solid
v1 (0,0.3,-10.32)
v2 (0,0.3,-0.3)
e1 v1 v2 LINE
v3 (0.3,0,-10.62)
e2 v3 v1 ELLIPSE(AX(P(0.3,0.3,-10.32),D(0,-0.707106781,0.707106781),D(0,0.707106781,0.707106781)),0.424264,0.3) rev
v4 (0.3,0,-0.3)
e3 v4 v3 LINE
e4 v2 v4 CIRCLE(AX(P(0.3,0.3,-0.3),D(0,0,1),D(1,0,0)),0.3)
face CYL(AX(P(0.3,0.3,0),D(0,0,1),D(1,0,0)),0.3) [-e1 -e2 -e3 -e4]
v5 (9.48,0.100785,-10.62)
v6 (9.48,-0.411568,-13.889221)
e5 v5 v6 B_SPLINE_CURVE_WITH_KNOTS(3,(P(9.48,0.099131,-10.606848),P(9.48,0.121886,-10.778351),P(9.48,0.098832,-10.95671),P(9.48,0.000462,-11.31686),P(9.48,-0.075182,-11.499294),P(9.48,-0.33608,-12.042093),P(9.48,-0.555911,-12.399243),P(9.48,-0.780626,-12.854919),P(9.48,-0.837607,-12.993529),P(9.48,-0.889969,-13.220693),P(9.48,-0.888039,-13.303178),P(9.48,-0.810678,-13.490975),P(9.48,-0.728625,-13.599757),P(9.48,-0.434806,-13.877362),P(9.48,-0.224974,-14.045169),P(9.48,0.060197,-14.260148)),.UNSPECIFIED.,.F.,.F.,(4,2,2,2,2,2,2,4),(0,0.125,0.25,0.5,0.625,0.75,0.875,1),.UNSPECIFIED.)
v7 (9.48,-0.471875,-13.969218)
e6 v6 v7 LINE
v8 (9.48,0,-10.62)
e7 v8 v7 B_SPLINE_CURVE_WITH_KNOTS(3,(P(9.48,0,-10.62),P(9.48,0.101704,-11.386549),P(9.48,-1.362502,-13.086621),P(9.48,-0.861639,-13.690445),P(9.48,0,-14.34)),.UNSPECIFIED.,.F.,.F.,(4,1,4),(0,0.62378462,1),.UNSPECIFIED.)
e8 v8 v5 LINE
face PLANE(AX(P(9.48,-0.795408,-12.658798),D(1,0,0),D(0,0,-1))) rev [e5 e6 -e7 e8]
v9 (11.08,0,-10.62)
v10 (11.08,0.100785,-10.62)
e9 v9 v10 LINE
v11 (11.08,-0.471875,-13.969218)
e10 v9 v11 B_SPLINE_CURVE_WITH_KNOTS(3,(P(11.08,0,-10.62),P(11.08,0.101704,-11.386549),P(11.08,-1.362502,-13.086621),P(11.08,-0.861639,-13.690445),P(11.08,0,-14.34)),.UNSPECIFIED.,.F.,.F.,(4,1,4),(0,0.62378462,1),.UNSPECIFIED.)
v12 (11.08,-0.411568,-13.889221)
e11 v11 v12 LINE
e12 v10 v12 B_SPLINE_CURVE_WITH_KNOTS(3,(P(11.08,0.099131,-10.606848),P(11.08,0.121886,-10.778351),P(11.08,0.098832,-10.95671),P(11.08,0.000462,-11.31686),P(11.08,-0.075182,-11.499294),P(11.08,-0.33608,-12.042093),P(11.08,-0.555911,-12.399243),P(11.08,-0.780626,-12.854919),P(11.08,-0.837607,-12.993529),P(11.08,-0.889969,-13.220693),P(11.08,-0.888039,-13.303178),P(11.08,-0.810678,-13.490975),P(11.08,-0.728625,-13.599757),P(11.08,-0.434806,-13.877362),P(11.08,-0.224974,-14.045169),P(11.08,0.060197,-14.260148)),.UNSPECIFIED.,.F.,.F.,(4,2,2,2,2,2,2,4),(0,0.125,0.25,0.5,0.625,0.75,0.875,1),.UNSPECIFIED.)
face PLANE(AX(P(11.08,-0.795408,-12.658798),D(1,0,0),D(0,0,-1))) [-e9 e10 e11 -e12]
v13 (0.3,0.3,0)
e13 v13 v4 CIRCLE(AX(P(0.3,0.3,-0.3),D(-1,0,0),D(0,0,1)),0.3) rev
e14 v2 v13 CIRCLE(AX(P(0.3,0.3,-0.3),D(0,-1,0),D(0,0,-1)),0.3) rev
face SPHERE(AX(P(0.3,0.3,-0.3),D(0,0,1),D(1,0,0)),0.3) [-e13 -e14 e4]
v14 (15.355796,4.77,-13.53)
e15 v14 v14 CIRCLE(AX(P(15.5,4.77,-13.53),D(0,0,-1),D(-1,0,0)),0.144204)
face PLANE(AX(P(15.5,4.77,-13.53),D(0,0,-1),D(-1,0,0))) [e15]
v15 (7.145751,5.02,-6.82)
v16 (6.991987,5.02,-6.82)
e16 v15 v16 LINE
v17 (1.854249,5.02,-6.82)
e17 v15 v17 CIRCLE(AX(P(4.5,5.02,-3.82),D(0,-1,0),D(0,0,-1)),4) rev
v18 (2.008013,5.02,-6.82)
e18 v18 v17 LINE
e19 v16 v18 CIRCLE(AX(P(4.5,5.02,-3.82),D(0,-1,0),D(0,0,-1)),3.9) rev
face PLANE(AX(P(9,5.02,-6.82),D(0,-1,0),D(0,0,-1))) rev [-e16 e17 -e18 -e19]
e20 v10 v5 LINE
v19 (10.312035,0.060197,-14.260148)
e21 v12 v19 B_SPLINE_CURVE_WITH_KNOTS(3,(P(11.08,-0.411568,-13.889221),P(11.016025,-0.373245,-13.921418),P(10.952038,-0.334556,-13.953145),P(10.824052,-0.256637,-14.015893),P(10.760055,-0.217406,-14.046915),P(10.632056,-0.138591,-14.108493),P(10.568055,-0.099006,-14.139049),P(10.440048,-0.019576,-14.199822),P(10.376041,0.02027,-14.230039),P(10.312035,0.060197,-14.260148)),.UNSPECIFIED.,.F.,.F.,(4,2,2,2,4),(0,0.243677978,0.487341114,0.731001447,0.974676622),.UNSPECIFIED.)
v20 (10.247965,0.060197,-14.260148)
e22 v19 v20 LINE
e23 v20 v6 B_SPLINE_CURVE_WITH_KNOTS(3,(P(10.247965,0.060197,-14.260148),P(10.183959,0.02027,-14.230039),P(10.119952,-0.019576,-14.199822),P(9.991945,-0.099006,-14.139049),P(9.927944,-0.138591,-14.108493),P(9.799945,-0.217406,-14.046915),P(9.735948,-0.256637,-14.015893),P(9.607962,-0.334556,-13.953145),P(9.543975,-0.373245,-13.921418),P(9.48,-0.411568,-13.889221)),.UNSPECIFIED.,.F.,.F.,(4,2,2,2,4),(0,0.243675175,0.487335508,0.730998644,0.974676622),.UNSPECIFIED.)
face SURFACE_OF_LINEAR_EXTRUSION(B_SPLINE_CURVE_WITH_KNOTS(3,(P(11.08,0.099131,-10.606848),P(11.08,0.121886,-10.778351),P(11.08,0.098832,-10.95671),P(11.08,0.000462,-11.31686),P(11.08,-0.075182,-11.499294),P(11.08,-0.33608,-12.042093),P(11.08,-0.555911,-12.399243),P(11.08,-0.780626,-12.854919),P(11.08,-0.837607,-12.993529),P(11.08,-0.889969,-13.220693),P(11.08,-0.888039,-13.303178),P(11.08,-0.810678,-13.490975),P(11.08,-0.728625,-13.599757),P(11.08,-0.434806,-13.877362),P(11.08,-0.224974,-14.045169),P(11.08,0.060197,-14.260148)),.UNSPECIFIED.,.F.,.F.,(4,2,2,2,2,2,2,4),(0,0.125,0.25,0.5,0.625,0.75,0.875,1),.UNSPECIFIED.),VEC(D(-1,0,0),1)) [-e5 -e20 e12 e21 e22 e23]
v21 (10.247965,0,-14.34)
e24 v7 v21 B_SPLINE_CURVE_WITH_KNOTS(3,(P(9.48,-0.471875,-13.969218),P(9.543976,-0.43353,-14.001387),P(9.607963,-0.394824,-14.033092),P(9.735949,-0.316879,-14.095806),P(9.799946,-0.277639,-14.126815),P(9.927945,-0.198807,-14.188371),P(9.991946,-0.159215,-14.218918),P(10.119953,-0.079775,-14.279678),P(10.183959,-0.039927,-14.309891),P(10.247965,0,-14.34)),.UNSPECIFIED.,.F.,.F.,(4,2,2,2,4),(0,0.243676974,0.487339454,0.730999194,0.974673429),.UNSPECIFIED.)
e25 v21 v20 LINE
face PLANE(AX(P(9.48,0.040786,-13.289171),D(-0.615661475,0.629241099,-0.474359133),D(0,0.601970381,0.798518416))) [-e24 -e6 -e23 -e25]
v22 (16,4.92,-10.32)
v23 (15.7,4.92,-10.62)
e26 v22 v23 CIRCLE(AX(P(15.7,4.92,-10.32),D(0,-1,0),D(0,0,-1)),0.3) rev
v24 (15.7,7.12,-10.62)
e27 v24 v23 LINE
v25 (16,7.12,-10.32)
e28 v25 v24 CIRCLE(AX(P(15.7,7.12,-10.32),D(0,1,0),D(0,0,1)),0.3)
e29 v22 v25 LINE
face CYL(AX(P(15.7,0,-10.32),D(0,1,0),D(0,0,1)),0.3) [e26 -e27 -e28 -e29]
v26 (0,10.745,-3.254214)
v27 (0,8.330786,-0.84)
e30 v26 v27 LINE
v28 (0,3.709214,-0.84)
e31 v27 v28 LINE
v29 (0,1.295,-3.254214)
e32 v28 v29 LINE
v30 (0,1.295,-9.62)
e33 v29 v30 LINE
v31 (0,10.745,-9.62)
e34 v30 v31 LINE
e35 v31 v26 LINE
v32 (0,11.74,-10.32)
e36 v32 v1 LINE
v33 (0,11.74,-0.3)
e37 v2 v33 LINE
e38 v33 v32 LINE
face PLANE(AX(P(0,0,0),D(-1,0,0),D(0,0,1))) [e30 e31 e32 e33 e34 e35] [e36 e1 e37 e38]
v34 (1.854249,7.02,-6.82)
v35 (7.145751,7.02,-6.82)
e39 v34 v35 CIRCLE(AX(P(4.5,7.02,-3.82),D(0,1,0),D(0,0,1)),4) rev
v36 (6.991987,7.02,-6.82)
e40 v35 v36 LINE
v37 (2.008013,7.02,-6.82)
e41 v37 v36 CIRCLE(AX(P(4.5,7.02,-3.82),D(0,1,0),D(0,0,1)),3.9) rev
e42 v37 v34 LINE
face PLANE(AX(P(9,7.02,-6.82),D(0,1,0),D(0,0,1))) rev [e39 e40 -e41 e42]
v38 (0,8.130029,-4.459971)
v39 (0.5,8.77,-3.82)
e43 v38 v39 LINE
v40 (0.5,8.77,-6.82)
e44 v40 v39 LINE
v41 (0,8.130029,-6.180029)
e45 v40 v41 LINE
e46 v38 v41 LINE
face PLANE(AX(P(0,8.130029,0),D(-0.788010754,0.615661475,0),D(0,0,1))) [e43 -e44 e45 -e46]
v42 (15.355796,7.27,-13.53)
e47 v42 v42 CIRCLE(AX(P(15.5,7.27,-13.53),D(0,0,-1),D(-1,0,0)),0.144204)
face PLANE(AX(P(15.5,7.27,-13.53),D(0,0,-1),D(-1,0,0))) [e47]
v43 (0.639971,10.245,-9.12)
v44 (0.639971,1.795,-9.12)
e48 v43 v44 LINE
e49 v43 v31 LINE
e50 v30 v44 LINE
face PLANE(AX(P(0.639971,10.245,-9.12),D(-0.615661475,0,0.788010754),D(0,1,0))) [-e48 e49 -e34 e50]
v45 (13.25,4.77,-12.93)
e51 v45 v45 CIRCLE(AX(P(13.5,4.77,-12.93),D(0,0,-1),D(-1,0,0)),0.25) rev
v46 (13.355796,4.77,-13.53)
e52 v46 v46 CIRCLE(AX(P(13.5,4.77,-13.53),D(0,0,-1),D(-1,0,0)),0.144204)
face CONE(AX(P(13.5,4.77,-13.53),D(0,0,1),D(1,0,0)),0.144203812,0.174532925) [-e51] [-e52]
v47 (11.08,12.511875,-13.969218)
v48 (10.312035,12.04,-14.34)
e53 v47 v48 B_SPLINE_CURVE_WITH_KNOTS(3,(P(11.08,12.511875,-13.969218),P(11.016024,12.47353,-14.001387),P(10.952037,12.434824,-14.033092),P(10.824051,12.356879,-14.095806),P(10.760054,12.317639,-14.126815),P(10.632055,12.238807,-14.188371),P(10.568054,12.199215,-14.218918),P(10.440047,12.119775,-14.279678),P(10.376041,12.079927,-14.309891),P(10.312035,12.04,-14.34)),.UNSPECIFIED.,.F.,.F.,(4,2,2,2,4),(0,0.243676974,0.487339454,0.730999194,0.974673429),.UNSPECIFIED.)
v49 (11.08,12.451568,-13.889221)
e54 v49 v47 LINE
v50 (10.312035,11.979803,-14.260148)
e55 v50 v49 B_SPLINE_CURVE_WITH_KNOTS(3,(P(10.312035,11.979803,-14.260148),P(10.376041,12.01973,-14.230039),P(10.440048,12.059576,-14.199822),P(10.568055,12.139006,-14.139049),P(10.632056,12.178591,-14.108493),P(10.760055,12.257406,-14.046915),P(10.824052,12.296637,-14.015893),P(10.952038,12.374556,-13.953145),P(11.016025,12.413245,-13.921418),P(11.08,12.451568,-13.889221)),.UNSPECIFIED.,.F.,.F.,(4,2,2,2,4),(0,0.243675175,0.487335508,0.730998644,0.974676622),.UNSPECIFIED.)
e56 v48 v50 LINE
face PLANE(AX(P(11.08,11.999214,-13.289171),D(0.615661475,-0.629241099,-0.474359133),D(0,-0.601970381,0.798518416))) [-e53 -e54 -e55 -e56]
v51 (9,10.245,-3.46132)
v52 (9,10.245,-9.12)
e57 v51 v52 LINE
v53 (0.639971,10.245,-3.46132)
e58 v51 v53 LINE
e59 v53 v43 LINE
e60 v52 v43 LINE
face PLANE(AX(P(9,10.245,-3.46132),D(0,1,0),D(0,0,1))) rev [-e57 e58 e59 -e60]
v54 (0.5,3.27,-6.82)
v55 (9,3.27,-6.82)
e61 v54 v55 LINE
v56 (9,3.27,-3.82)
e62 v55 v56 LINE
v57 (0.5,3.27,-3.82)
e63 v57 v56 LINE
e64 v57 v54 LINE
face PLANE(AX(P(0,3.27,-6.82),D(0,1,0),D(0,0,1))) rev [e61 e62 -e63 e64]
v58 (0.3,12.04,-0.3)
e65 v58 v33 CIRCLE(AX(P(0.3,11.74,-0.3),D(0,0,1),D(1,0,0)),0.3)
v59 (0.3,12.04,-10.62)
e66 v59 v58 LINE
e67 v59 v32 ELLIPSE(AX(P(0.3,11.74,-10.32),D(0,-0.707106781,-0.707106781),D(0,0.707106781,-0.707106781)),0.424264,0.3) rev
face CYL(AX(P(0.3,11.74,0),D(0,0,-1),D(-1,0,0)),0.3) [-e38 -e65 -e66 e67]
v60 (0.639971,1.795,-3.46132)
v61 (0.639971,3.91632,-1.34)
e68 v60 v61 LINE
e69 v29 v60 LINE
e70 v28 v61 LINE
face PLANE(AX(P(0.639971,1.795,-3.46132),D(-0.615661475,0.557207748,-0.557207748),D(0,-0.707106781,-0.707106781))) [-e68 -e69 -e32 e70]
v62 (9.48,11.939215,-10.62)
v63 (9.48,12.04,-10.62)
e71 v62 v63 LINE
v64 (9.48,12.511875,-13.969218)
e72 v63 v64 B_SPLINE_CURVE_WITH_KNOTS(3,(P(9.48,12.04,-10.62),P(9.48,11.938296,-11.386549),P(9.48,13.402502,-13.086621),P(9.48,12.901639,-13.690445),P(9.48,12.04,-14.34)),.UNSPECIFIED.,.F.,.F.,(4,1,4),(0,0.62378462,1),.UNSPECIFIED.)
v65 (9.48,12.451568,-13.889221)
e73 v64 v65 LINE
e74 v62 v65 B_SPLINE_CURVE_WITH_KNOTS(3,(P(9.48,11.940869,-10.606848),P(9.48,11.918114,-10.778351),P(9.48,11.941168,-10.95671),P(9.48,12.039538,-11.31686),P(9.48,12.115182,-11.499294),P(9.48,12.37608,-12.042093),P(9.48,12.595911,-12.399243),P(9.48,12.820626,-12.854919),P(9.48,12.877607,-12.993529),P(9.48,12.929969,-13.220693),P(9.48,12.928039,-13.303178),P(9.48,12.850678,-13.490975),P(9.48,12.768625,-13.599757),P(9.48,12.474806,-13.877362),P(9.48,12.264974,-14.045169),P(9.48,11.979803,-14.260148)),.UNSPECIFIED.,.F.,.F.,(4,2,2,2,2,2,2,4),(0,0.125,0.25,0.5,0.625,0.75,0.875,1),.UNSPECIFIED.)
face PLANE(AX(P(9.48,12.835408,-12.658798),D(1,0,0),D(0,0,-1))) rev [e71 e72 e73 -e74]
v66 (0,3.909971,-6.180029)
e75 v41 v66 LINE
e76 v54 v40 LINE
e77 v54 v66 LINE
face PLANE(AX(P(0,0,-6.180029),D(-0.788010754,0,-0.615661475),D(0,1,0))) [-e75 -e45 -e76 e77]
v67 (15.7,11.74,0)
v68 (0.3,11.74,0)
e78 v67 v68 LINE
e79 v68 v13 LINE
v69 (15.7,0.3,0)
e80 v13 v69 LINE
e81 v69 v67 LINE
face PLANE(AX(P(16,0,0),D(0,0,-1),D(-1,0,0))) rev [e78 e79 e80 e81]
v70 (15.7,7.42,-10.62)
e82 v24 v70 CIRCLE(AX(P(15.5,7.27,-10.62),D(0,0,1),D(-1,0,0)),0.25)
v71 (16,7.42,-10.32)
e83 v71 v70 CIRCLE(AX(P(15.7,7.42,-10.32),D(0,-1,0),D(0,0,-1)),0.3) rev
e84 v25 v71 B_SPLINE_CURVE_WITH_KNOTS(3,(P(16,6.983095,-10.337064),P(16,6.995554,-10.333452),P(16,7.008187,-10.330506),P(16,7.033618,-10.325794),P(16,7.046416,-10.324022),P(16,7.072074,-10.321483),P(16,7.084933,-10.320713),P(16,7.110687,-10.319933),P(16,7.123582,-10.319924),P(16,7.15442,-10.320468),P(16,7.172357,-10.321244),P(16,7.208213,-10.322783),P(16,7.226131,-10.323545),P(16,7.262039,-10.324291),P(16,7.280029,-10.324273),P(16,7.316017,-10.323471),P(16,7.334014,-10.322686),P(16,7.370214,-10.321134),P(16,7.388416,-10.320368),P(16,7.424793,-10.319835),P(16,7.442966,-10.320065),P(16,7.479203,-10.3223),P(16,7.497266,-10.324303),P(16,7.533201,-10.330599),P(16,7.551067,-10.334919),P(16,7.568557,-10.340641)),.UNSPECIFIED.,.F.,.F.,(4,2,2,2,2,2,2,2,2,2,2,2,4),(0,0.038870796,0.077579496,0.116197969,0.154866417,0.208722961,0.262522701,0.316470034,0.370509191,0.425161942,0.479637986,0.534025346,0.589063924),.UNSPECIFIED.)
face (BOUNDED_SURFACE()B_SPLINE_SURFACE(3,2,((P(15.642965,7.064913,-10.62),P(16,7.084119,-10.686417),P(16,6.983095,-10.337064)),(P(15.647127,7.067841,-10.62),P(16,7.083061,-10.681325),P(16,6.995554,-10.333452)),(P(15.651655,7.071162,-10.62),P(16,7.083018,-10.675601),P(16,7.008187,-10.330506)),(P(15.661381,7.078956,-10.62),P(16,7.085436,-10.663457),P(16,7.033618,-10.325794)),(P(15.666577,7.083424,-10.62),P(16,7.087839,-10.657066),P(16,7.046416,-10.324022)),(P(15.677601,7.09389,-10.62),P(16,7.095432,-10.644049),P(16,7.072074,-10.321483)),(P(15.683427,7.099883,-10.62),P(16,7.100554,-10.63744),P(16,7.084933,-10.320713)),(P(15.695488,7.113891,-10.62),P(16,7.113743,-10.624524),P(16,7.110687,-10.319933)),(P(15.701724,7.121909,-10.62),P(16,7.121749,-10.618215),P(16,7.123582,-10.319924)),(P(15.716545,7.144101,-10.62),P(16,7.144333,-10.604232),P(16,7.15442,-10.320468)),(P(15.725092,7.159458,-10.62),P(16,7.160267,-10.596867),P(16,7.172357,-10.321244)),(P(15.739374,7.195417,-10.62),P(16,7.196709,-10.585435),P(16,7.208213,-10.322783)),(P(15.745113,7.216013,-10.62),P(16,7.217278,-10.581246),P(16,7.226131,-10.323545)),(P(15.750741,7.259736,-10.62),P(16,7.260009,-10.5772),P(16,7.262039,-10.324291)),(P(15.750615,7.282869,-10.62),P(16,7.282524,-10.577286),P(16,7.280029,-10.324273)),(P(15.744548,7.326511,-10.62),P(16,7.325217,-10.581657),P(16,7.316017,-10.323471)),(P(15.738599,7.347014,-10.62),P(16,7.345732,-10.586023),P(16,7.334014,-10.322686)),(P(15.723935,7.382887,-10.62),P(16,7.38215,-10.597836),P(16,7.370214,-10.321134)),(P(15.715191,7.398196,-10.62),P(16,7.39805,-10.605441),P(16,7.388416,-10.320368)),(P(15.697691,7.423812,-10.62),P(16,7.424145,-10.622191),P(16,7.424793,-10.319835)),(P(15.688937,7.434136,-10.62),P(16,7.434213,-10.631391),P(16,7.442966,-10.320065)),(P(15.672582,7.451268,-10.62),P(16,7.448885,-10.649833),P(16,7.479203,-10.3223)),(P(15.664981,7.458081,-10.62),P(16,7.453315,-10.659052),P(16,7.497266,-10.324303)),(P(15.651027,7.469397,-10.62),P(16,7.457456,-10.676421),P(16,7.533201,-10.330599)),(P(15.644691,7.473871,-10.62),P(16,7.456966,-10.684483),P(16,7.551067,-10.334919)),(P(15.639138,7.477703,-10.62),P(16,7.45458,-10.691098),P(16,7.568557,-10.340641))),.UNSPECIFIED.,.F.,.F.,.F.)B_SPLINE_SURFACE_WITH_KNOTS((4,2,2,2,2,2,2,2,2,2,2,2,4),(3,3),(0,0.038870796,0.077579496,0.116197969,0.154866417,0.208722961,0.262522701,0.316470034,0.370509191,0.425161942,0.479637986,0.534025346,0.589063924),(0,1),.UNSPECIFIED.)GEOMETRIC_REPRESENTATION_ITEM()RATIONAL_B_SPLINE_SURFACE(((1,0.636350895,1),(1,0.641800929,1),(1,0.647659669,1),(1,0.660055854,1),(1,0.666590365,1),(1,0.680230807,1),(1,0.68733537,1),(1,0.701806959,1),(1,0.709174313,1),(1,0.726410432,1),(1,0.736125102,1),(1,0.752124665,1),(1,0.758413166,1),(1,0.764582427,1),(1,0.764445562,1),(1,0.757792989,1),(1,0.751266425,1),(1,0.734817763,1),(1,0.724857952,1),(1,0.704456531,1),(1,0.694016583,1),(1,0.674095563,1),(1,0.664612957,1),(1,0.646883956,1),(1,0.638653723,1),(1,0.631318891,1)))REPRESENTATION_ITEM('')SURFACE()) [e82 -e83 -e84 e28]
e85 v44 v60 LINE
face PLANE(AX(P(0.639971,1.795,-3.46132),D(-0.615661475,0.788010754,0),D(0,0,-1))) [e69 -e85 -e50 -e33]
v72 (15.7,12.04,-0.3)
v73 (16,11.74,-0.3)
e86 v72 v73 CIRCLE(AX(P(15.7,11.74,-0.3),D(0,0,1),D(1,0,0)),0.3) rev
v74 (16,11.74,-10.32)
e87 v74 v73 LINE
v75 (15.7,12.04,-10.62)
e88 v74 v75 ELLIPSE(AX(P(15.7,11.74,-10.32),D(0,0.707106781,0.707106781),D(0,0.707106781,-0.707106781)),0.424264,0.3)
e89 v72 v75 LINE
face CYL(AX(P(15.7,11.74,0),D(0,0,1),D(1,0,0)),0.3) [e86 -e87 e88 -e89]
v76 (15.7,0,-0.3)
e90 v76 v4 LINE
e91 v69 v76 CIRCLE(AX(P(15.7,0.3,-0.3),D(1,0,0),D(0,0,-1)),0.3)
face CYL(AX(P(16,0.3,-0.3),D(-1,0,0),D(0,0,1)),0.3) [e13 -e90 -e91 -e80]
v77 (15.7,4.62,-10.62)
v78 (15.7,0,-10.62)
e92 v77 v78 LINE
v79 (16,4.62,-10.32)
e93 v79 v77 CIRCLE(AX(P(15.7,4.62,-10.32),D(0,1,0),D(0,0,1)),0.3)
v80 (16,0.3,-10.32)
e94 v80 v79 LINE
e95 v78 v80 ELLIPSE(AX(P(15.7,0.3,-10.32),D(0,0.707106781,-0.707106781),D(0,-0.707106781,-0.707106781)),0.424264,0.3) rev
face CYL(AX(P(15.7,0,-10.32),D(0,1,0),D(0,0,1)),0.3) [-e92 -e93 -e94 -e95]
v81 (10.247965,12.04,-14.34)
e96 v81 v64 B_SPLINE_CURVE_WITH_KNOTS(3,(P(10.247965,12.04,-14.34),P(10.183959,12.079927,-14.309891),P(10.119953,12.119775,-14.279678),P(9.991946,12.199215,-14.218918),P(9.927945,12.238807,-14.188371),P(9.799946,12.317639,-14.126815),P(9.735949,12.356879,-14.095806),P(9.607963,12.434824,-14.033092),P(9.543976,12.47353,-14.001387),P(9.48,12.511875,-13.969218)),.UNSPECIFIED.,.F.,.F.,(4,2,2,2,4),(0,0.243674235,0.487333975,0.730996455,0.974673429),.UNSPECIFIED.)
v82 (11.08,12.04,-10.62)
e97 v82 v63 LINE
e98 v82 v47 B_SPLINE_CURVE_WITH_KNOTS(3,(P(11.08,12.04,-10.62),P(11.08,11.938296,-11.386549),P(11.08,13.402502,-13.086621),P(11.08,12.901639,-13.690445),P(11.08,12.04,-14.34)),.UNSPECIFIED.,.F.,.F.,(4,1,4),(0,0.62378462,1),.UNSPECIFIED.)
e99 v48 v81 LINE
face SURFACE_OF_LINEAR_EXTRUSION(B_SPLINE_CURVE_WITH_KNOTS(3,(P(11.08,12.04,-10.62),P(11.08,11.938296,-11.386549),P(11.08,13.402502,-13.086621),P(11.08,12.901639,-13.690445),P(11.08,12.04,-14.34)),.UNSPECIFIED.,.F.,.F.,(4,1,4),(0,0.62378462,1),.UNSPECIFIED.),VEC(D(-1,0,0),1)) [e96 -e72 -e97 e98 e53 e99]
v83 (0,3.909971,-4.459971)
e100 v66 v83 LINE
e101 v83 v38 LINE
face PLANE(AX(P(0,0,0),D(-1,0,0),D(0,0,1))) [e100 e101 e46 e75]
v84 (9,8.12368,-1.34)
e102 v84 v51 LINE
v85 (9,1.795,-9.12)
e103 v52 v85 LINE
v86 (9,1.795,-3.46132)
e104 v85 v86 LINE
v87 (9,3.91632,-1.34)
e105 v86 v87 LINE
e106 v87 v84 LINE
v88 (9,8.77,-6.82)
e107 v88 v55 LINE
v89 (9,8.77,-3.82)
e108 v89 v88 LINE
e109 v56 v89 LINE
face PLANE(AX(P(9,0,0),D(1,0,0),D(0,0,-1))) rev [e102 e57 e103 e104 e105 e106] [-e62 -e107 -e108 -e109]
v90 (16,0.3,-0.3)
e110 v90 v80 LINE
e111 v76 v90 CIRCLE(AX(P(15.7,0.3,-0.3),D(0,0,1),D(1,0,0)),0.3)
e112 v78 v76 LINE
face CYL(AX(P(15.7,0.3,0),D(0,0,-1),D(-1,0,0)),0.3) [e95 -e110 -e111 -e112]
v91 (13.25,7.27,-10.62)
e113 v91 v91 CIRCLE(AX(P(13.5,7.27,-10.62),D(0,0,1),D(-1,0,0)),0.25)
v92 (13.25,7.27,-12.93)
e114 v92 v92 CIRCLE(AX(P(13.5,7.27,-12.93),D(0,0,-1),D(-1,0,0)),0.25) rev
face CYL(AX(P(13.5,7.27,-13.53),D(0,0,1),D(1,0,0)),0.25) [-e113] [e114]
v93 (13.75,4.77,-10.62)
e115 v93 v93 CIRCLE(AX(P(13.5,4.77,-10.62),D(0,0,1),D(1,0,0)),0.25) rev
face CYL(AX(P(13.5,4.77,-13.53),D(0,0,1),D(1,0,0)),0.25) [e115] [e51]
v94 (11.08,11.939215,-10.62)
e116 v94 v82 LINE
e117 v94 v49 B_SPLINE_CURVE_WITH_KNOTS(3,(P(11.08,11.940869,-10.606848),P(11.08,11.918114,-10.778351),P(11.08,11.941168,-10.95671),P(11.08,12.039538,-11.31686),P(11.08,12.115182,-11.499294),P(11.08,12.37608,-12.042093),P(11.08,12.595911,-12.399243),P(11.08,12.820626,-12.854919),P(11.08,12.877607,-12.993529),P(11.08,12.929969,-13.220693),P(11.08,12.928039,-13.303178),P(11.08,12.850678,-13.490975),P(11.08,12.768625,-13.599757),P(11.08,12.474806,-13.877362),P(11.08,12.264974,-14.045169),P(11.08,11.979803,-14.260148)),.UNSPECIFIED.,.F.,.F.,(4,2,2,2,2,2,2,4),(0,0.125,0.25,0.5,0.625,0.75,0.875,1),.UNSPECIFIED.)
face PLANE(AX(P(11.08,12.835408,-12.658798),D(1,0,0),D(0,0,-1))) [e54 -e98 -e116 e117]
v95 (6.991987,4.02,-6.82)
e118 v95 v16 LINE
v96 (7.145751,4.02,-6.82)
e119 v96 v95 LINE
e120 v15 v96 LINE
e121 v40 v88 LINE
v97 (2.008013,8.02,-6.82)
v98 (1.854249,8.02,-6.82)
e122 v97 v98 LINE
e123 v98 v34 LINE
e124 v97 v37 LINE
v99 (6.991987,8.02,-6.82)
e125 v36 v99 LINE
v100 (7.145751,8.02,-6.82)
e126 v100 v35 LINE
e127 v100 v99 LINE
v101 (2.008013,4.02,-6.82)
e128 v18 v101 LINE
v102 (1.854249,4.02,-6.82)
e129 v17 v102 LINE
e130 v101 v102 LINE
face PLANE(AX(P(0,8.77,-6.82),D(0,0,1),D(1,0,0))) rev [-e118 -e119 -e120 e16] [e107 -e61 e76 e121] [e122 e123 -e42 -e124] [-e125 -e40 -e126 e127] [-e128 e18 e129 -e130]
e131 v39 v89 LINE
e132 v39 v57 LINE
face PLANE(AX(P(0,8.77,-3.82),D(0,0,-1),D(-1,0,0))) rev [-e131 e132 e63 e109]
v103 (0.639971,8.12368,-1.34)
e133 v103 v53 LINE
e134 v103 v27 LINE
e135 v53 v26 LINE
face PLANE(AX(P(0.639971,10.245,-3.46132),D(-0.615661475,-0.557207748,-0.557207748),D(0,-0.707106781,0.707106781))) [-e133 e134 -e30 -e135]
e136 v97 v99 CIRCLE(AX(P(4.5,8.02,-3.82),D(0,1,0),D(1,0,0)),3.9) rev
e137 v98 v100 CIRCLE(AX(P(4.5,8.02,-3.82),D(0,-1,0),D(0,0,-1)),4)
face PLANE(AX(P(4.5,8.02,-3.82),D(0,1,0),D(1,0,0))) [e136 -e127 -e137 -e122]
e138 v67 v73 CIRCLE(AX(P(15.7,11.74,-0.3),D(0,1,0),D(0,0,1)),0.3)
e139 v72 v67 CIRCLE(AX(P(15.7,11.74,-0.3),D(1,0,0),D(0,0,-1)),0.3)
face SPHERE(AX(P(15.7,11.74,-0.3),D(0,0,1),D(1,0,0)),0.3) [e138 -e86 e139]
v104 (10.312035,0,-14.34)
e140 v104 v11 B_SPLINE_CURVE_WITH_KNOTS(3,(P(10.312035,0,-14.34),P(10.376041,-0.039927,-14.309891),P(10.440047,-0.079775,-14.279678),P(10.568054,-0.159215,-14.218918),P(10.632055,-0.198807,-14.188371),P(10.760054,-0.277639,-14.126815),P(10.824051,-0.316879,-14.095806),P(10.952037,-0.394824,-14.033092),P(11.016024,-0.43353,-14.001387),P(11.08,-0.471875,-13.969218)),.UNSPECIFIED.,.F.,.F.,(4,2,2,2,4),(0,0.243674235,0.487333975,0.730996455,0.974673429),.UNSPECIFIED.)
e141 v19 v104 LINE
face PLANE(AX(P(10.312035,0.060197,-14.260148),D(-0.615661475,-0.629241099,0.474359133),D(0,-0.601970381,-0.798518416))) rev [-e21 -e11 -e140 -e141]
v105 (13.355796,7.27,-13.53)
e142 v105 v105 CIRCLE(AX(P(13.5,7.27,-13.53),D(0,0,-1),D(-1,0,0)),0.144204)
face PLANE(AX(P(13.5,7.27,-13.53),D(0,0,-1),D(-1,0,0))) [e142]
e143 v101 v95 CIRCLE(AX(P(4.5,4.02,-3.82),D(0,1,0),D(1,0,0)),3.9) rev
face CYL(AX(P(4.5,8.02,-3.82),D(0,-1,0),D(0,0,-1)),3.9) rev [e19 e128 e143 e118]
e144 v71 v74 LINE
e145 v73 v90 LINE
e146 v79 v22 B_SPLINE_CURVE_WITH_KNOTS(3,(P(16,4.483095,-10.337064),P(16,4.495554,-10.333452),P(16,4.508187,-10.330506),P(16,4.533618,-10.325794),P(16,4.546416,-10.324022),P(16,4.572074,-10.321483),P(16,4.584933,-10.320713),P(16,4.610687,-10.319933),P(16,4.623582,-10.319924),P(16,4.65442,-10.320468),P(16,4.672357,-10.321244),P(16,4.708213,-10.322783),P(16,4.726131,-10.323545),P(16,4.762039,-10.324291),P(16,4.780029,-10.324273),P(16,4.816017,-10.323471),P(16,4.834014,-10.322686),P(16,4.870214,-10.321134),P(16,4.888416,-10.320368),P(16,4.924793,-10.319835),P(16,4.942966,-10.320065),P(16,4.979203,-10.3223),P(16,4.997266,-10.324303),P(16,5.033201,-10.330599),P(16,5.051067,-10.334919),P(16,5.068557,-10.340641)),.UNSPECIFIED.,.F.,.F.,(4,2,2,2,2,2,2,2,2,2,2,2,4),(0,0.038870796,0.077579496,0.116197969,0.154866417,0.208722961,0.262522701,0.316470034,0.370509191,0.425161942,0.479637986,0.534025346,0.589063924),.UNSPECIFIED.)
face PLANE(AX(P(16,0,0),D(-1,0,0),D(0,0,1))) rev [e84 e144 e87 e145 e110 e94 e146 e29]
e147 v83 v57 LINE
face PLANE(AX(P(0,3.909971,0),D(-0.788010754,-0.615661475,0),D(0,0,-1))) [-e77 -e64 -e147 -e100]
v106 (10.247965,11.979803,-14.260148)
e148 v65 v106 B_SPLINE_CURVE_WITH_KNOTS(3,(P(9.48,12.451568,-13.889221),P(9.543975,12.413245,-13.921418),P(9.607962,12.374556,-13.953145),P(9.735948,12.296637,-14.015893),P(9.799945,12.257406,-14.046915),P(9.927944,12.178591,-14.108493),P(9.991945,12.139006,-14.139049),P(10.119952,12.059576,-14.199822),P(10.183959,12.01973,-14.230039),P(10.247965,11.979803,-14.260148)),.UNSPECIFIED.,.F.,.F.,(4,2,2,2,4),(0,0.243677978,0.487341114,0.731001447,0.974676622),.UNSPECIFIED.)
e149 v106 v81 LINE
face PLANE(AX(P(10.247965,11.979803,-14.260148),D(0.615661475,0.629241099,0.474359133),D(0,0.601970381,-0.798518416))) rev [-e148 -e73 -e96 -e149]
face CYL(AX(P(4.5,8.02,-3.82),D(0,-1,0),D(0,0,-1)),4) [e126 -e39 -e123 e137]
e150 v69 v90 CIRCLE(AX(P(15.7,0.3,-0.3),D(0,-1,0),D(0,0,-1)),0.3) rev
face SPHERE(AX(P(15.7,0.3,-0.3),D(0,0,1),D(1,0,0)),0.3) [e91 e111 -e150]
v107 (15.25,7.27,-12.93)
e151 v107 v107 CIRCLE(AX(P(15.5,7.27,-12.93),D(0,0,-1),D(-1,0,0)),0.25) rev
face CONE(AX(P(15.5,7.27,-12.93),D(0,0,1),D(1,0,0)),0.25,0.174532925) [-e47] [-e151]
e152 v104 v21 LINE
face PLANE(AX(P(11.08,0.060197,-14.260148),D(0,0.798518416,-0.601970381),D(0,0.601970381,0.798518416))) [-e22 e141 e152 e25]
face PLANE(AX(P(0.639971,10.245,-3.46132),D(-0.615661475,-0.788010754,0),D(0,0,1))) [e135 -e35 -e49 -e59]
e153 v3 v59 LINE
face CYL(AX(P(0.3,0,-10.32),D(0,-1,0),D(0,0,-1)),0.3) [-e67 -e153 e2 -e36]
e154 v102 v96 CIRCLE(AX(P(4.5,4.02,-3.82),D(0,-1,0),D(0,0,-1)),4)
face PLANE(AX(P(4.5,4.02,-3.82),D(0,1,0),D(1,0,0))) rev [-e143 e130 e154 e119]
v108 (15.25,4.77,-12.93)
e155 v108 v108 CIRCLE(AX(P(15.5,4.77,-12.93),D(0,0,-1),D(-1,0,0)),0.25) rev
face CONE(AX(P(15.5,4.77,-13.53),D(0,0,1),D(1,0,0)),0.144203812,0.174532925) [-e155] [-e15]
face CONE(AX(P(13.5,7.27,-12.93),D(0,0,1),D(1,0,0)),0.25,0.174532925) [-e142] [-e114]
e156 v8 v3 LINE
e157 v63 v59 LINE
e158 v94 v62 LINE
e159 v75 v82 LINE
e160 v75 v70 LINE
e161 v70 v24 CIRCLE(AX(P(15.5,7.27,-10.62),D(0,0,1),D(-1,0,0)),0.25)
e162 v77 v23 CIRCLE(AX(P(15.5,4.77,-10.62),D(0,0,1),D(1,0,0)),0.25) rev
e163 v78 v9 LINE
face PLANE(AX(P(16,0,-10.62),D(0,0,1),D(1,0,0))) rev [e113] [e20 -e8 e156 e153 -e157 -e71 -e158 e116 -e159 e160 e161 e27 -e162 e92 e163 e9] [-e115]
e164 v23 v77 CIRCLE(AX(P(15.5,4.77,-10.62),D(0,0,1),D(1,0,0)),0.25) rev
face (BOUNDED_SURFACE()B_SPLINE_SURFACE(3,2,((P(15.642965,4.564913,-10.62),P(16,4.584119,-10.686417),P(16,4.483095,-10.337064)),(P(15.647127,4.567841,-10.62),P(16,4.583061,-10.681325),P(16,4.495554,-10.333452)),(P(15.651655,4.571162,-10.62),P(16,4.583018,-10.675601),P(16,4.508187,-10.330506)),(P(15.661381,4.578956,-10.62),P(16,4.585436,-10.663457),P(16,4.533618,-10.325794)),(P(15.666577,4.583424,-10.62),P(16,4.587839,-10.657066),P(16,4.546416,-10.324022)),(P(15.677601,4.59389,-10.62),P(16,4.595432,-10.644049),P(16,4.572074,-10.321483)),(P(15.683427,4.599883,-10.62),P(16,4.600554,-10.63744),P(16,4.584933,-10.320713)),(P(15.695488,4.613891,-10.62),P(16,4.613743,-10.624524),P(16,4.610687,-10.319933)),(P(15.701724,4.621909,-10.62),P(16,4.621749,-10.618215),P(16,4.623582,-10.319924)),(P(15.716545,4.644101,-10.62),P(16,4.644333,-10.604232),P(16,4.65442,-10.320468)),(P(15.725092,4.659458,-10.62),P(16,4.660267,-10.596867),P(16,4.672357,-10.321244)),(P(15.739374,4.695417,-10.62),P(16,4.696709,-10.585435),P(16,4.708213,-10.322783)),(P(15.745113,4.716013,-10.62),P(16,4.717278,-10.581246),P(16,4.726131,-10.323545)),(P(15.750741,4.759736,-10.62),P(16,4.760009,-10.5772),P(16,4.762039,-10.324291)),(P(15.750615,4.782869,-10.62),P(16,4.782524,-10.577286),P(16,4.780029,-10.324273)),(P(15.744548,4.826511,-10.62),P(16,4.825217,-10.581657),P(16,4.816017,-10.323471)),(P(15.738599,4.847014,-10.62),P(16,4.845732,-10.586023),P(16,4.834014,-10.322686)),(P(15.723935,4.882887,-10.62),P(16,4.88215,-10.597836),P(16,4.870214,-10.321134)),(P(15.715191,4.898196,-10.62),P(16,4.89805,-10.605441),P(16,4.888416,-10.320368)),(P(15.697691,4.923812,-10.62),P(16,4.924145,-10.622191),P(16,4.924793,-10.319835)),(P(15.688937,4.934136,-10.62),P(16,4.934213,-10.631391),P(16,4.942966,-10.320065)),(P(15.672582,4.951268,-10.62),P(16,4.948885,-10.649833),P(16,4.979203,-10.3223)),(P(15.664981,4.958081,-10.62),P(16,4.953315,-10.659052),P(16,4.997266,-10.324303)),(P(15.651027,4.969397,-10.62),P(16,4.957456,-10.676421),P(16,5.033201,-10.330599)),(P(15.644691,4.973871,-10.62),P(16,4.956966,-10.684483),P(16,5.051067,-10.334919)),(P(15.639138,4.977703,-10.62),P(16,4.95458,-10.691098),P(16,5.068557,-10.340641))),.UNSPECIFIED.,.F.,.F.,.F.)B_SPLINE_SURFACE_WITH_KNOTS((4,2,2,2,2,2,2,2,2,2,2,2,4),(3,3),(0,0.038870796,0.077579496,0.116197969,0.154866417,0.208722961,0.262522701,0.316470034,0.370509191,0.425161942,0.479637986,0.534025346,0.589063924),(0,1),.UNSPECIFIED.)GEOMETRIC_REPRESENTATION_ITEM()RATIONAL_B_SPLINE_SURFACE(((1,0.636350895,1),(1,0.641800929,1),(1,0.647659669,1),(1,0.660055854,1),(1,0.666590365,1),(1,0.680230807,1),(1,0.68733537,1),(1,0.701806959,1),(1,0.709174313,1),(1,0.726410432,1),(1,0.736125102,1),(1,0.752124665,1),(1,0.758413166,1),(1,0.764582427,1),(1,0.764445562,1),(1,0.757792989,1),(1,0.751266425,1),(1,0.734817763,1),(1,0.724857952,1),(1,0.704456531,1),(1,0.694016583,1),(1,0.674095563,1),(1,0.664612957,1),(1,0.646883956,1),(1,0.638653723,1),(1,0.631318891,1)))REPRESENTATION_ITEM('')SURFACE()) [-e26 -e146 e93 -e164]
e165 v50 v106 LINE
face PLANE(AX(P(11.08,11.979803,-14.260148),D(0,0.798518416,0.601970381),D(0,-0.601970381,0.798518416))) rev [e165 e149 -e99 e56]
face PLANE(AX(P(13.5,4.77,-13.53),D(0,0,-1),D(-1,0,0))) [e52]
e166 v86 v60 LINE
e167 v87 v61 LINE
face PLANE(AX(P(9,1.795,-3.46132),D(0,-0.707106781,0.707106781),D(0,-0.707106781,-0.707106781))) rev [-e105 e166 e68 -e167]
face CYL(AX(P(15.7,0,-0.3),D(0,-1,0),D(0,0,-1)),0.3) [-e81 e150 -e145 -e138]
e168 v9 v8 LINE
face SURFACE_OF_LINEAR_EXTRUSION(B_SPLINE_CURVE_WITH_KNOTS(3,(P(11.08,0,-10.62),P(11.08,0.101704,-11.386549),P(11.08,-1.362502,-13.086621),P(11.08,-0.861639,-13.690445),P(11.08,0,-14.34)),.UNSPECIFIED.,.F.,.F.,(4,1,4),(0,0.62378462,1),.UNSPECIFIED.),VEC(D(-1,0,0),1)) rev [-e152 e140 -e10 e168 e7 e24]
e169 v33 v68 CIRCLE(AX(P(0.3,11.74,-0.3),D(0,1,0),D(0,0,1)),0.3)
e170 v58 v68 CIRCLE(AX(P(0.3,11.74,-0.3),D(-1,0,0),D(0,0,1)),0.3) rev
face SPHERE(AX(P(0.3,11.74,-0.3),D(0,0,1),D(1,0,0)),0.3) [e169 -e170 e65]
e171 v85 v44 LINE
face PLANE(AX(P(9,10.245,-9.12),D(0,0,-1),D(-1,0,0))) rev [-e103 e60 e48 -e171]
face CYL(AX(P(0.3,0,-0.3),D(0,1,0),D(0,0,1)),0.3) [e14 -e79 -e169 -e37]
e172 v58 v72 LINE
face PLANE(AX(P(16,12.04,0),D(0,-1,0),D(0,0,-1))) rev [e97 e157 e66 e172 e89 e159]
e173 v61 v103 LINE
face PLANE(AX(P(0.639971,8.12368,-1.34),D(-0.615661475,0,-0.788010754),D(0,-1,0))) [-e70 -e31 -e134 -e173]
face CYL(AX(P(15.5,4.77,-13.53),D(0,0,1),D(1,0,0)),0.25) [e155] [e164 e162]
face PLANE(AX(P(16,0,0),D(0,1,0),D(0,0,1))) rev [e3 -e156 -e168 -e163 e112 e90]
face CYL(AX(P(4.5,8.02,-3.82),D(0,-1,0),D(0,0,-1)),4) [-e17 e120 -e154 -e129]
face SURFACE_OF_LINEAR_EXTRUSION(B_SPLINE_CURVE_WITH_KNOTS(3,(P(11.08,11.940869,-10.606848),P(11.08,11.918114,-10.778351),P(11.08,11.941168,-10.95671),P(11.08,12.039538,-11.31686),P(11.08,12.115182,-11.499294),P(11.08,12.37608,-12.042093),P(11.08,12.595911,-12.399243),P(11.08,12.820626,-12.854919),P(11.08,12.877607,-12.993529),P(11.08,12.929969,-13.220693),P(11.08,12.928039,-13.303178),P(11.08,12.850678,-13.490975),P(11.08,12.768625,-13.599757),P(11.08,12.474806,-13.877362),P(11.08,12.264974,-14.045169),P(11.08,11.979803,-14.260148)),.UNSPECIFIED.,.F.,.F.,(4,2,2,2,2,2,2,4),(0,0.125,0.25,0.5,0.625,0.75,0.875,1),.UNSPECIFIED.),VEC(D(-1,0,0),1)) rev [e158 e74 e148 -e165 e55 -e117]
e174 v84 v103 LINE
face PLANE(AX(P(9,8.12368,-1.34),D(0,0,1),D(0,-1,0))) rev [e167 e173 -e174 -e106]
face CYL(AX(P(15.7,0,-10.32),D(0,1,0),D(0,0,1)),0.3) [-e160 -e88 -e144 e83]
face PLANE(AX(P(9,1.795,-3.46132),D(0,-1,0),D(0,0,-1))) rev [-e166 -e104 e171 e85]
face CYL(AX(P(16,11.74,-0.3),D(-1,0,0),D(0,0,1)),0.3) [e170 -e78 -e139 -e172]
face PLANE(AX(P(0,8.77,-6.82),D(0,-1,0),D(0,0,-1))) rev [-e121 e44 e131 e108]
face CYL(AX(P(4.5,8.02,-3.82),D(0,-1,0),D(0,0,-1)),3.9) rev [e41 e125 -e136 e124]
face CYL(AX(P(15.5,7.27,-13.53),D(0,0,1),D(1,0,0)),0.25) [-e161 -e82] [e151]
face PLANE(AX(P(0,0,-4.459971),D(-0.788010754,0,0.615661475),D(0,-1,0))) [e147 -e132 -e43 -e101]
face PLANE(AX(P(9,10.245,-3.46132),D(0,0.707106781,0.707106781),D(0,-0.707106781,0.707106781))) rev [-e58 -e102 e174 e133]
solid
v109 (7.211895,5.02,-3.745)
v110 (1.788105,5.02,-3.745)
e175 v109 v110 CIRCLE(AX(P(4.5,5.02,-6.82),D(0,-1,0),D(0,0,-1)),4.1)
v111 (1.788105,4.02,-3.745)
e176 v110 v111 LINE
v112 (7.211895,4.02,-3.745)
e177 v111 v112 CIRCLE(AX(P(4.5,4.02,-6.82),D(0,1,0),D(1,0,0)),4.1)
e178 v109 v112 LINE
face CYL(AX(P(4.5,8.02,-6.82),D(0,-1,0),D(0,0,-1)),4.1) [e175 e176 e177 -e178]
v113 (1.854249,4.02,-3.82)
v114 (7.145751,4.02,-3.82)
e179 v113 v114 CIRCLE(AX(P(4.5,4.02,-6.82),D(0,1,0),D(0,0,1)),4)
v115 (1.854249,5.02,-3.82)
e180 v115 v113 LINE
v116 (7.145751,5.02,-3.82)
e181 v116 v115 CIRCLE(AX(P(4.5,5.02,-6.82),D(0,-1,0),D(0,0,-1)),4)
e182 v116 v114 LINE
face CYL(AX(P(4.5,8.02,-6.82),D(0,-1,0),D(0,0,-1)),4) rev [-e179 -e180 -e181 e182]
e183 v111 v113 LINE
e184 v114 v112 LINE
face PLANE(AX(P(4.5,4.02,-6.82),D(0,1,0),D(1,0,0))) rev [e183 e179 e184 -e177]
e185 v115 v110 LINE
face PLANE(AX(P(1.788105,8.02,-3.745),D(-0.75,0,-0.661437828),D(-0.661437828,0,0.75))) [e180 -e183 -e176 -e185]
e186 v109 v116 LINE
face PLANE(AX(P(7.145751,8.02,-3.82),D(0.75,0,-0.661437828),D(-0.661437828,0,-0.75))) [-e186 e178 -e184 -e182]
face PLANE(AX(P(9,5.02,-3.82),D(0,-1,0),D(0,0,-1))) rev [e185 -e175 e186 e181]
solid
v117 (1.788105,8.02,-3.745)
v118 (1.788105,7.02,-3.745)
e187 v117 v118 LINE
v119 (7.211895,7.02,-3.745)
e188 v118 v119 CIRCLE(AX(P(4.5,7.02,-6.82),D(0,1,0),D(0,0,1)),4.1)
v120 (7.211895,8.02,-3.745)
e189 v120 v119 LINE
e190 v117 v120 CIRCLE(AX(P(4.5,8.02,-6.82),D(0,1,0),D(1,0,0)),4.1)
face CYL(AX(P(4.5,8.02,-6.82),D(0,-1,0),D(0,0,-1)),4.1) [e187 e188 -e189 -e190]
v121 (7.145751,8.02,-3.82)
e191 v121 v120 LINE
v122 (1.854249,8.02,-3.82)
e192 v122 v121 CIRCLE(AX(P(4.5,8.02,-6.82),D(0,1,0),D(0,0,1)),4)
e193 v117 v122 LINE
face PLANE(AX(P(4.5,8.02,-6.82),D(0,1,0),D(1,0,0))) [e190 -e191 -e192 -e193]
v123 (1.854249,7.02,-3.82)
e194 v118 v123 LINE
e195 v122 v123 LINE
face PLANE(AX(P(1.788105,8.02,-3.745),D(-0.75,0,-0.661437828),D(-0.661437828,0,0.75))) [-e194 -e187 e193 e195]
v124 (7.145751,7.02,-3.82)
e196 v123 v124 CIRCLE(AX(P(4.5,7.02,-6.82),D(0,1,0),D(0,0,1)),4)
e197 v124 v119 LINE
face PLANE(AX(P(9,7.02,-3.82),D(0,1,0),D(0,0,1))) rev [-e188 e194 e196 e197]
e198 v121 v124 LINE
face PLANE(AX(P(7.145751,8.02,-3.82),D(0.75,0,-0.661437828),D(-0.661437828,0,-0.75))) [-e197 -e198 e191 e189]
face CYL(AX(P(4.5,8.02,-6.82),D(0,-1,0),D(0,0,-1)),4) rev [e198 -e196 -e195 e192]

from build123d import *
from OCP.BRepFilletAPI import BRepFilletAPI_MakeChamfer

# Parameters (mm, degrees)
SKETCH1_W                 = 10.62
SKETCH1_H                 = 12.04
BOSS_EXTRUDE1_DEPTH       = 16
CUT_EXTRUDE1_DEPTH        = 9
SKETCH3_W                 = 3
SKETCH3_H                 = 5.5
BOSS_EXTRUDE2_DEPTH       = 9
EXTRUDE_THIN1_DEPTH       = 2
SKETCH5_W                 = 1
SKETCH5_H                 = 2
SKETCH5_W_2               = 1.1
CUT_EXTRUDE2_DEPTH        = 9
SKETCH6_R                 = 0.25
BOSS_EXTRUDE4_DEPTH       = 2.91
CHAMFER1_SIZE             = 0.6
CHAMFER1_SIZE2            = 0.105796188
EXTRUDE_THIN2_START       = -0.8
EXTRUDE_THIN2_DEPTH       = 1.6
CHAMFER2_SIZE             = 0.6
CHAMFER2_SIZE2            = 0.767964979
CHAMFER2_OF_MIRROR2_SIZE  = 0.6
CHAMFER2_OF_MIRROR2_SIZE2 = 0.767964979
CHAMFER3_SIZE             = 0.5
CHAMFER3_SIZE2            = 0.639970816
FILLET1_R                 = 0.3


# Read off the part's stored shape, not the designer's step: Extrude-Thin2
with BuildPart() as part:
    # Sketch1 → Boss-Extrude1 (new body)
    with BuildSketch(Plane(origin=(0, 0, 0), x_dir=(0, 0, -1), z_dir=(1, 0, 0))):
        with Locations((5.31, 6.02)):
            Rectangle(SKETCH1_W, SKETCH1_H)
    extrude(amount=BOSS_EXTRUDE1_DEPTH)

    # Sketch2 → Cut-Extrude1 (cut)
    with BuildSketch(Plane.ZY):
        Polygon((-3.461320344, 10.245), (-1.34, 8.123679656), (-1.34, 3.916320344), (-3.461320344, 1.795), (-9.12, 1.795), (-9.12, 10.245), align=None)
    extrude(amount=-CUT_EXTRUDE1_DEPTH, mode=Mode.SUBTRACT)

    # Sketch3 → Boss-Extrude2 (add)
    with BuildSketch(Plane.ZY.offset(-9)):
        with Locations((-5.32, 6.02)):
            Rectangle(SKETCH3_W, SKETCH3_H)
    extrude(amount=BOSS_EXTRUDE2_DEPTH)

    # Sketch4 → Extrude-Thin1 (add, symmetric)
    with BuildSketch(Plane(origin=(0, 6.02, 0), x_dir=(1, 0, 0), z_dir=(0, 1, 0))):
        with BuildLine():
            ThreePointArc((1.854248689, 3.82), (4.5, 2.82), (7.145751311, 3.82))
            Line((7.145751311, 3.82), (7.211895094, 3.745))
            ThreePointArc((7.211895094, 3.745), (4.5, 2.72), (1.788104906, 3.745))
            Line((1.788104906, 3.745), (1.854248689, 3.82))
        make_face()
        with BuildLine():
            ThreePointArc((1.854248689, 6.82), (4.5, 7.82), (7.145751311, 6.82))
            Line((7.145751311, 6.82), (7.079607528, 6.745))
            ThreePointArc((7.079607528, 6.745), (4.5, 7.72), (1.920392472, 6.745))
            Line((1.920392472, 6.745), (1.854248689, 6.82))
        make_face()
    extrude(amount=EXTRUDE_THIN1_DEPTH, both=True)


with BuildPart() as extrude_thin1_piece_1:
    # of the separate pieces the step leaves, piece 1, a body of its own (extrude_thin1_pieces)
    add(part.part.solids().sort_by_distance((0, 0, 0))[0])


with BuildPart() as extrude_thin1_piece_2:
    # of the separate pieces the step leaves, piece 2, a body of its own (extrude_thin1_pieces)
    add(part.part.solids().sort_by_distance((1.788104906, 4.02, -3.745))[0])


with BuildPart() as cut_extrude2_tool:
    # Sketch5 → Cut-Extrude2 (new body)
    with BuildSketch(Plane.ZY):
        with Locations((-7.32, 6.02)):
            Rectangle(SKETCH5_W, SKETCH5_H)
        with Locations((-3.27, 6.02)):
            Rectangle(SKETCH5_W_2, SKETCH5_H)
    extrude(amount=-CUT_EXTRUDE2_DEPTH)


with BuildPart() as extrude_thin1_piece_1_1:
    add(extrude_thin1_piece_1.part)

    # Cut-Extrude2: cut by cut_extrude2_tool
    add(cut_extrude2_tool.part, mode=Mode.SUBTRACT)

    # Sketch6 → Boss-Extrude4 (add)
    with BuildSketch(Plane(origin=(0, 0, -10.62), x_dir=(-1, 0, 0), z_dir=(0, 0, -1))):
        with Locations(Location((-15.5, 4.77, 0), (0, 0, 180))):
            Circle(SKETCH6_R)
        with Locations(Location((-13.5, 4.77, 0), (0, 0, 180))):
            Circle(SKETCH6_R)
    boss_extrude4 = extrude(amount=BOSS_EXTRUDE4_DEPTH)

    # Mirror1: Boss-Extrude4 across plane
    add(boss_extrude4.mirror(Plane.ZX.offset(6.02)))

    # Chamfer1: one chamfer whose edges measure the first distance from different faces: ONE call of the kernel's chamfer builder (chamfer() names one face for all edges)
    chamfer1_edges_1 = [extrude_thin1_piece_1_1.edges().sort_by_distance(p)[0] for p in [
        (15.25, 4.77, -13.53),
    ]]
    chamfer1_side_1 = [extrude_thin1_piece_1_1.faces().sort_by_distance(p)[0] for p in [
        (15.25, 4.77, -12.075),
    ]]
    chamfer1_edges_2 = [extrude_thin1_piece_1_1.edges().sort_by_distance(p)[0] for p in [
        (13.25, 4.77, -13.53),
    ]]
    chamfer1_side_2 = [extrude_thin1_piece_1_1.faces().sort_by_distance(p)[0] for p in [
        (13.25, 4.77, -12.075),
    ]]
    chamfer1_edges_3 = [extrude_thin1_piece_1_1.edges().sort_by_distance(p)[0] for p in [
        (15.25, 7.27, -13.53),
    ]]
    chamfer1_side_3 = [extrude_thin1_piece_1_1.faces().sort_by_distance(p)[0] for p in [
        (15.25, 7.27, -12.075),
    ]]
    chamfer1_edges_4 = [extrude_thin1_piece_1_1.edges().sort_by_distance(p)[0] for p in [
        (13.25, 7.27, -13.53),
    ]]
    chamfer1_side_4 = [extrude_thin1_piece_1_1.faces().sort_by_distance(p)[0] for p in [
        (13.25, 7.27, -12.075),
    ]]
    chamfer1 = BRepFilletAPI_MakeChamfer(extrude_thin1_piece_1_1.part.solid().wrapped)
    for e in chamfer1_edges_1:
        chamfer1.Add(CHAMFER1_SIZE, CHAMFER1_SIZE2, e.wrapped, chamfer1_side_1[0].wrapped)  # the first distance lies on this face
    for e in chamfer1_edges_2:
        chamfer1.Add(CHAMFER1_SIZE, CHAMFER1_SIZE2, e.wrapped, chamfer1_side_2[0].wrapped)  # the first distance lies on this face
    for e in chamfer1_edges_3:
        chamfer1.Add(CHAMFER1_SIZE, CHAMFER1_SIZE2, e.wrapped, chamfer1_side_3[0].wrapped)  # the first distance lies on this face
    for e in chamfer1_edges_4:
        chamfer1.Add(CHAMFER1_SIZE, CHAMFER1_SIZE2, e.wrapped, chamfer1_side_4[0].wrapped)  # the first distance lies on this face
    add(Compound.cast(chamfer1.Shape()), mode=Mode.REPLACE)

    # Extrude-Thin2 outline → Extrude-Thin2 (add)
    with BuildSketch(Plane(origin=(10.28, 0, 0), x_dir=(0, 0, -1), z_dir=(1, 0, 0)).offset(EXTRUDE_THIN2_START)):
        with BuildLine():
            add(Edge.make_bspline(
                [(10.62, 0.100785264), (10.78746189, 0.120691448), (10.961308674, 0.097575512), (11.31686022, 0.000462287), (11.499294447, -0.075182032), (12.042092662, -0.336079557), (12.399243383, -0.555911401), (12.854919353, -0.78062608), (12.993528767, -0.837606718), (13.220692587, -0.889968812), (13.303177575, -0.888038744), (13.490975312, -0.810678223), (13.599756729, -0.728624571), (13.87736205, -0.434805978), (14.045169288, -0.224974114), (14.260148158, 0.060197038)],
                knots=[0.00319215, 0.00319215, 0.00319215, 0.00319215, 0.125, 0.125, 0.25, 0.25, 0.5, 0.5, 0.625, 0.625, 0.75, 0.75, 0.875, 0.875, 1, 1, 1, 1], degree=3))
            Line((10.62, 0.100785264), (10.62, 0))
            add(Edge.make_bspline(
                [(10.62, 0), (11.386548613, 0.101703811), (13.086621384, -1.362502031), (13.690445345, -0.861639328), (14.34, 0)],
                knots=[0, 0, 0, 0, 0.62378462, 1, 1, 1, 1], degree=3))
            Line((14.34, 0), (14.260148158, 0.060197038))
        make_face()
    extrude_thin2 = extrude(amount=EXTRUDE_THIN2_DEPTH)

    # Chamfer2: one chamfer whose edges measure the first distance from different faces: ONE call of the kernel's chamfer builder (chamfer() names one face for all edges)
    chamfer2_edges_1 = [extrude_thin1_piece_1_1.edges().sort_by_distance(p)[0] for p in [
        (9.48, 0.030098519, -14.300074079),
    ]]
    chamfer2_side_1 = [extrude_thin1_piece_1_1.faces().sort_by_distance(p)[0] for p in [
        (9.48, -0.678712297, -12.564688228),
    ]]
    chamfer2_edges_2 = [extrude_thin1_piece_1_1.edges().sort_by_distance(p)[0] for p in [
        (11.08, 0.030098519, -14.300074079),
    ]]
    chamfer2_side_2 = [extrude_thin1_piece_1_1.faces().sort_by_distance(p)[0] for p in [
        (11.08, -0.678712297, -12.564688228),
    ]]
    chamfer2 = BRepFilletAPI_MakeChamfer(extrude_thin1_piece_1_1.part.solid().wrapped)
    for e in chamfer2_edges_1:
        chamfer2.Add(CHAMFER2_SIZE, CHAMFER2_SIZE2, e.wrapped, chamfer2_side_1[0].wrapped)  # the first distance lies on this face
    for e in chamfer2_edges_2:
        chamfer2.Add(CHAMFER2_SIZE, CHAMFER2_SIZE2, e.wrapped, chamfer2_side_2[0].wrapped)  # the first distance lies on this face
    add(Compound.cast(chamfer2.Shape()), mode=Mode.REPLACE)

    # Mirror2: Extrude-Thin2 across plane
    add(extrude_thin2.mirror(Plane.ZX.offset(6.02)))

    # Chamfer2 of Mirror2: one chamfer whose edges measure the first distance from different faces: ONE call of the kernel's chamfer builder (chamfer() names one face for all edges)
    chamfer2_of_mirror2_edges_1 = [extrude_thin1_piece_1_1.edges().sort_by_distance(p)[0] for p in [
        (9.48, 12.009901481, -14.300074079),
    ]]
    chamfer2_of_mirror2_side_1 = [extrude_thin1_piece_1_1.faces().sort_by_distance(p)[0] for p in [
        (9.48, 12.718712297, -12.564688228),
    ]]
    chamfer2_of_mirror2_edges_2 = [extrude_thin1_piece_1_1.edges().sort_by_distance(p)[0] for p in [
        (11.08, 12.009901481, -14.300074079),
    ]]
    chamfer2_of_mirror2_side_2 = [extrude_thin1_piece_1_1.faces().sort_by_distance(p)[0] for p in [
        (11.08, 12.718712297, -12.564688228),
    ]]
    chamfer2_of_mirror2 = BRepFilletAPI_MakeChamfer(extrude_thin1_piece_1_1.part.solid().wrapped)
    for e in chamfer2_of_mirror2_edges_1:
        chamfer2_of_mirror2.Add(CHAMFER2_OF_MIRROR2_SIZE, CHAMFER2_OF_MIRROR2_SIZE2, e.wrapped, chamfer2_of_mirror2_side_1[0].wrapped)  # the first distance lies on this face
    for e in chamfer2_of_mirror2_edges_2:
        chamfer2_of_mirror2.Add(CHAMFER2_OF_MIRROR2_SIZE, CHAMFER2_OF_MIRROR2_SIZE2, e.wrapped, chamfer2_of_mirror2_side_2[0].wrapped)  # the first distance lies on this face
    add(Compound.cast(chamfer2_of_mirror2.Shape()), mode=Mode.REPLACE)

    # Chamfer3: one chamfer whose edges measure the first distance from different faces: ONE call of the kernel's chamfer builder (chamfer() names one face for all edges)
    chamfer3_edges_1 = [extrude_thin1_piece_1_1.edges().sort_by_distance(p)[0] for p in [
        (0, 2.855660172, -2.400660172),
        (0, 6.02, -1.34),
        (0, 9.184339828, -2.400660172),
        (0, 10.245, -6.290660172),
        (0, 6.02, -9.12),
        (0, 1.795, -6.290660172),
    ]]
    chamfer3_side_1 = [extrude_thin1_piece_1_1.faces().sort_by_distance(p)[0] for p in [
        (0, 0.160544698, -5.31),
    ]]
    chamfer3_edges_2 = [extrude_thin1_piece_1_1.edges().sort_by_distance(p)[0] for p in [
        (0, 6.02, -6.82),
    ]]
    chamfer3_side_2 = [extrude_thin1_piece_1_1.faces().sort_by_distance(p)[0] for p in [
        (4.5, 6.02, -6.82),
    ]]
    chamfer3_edges_3 = [extrude_thin1_piece_1_1.edges().sort_by_distance(p)[0] for p in [
        (0, 3.27, -5.32),
    ]]
    chamfer3_side_3 = [extrude_thin1_piece_1_1.faces().sort_by_distance(p)[0] for p in [
        (4.5, 3.27, -5.32),
    ]]
    chamfer3_edges_4 = [extrude_thin1_piece_1_1.edges().sort_by_distance(p)[0] for p in [
        (0, 6.02, -3.82),
    ]]
    chamfer3_side_4 = [extrude_thin1_piece_1_1.faces().sort_by_distance(p)[0] for p in [
        (4.5, 6.02, -3.82),
    ]]
    chamfer3_edges_5 = [extrude_thin1_piece_1_1.edges().sort_by_distance(p)[0] for p in [
        (0, 8.77, -5.32),
    ]]
    chamfer3_side_5 = [extrude_thin1_piece_1_1.faces().sort_by_distance(p)[0] for p in [
        (4.5, 8.77, -5.32),
    ]]
    chamfer3 = BRepFilletAPI_MakeChamfer(extrude_thin1_piece_1_1.part.solid().wrapped)
    for e in chamfer3_edges_1:
        chamfer3.Add(CHAMFER3_SIZE, CHAMFER3_SIZE2, e.wrapped, chamfer3_side_1[0].wrapped)  # the first distance lies on this face
    for e in chamfer3_edges_2:
        chamfer3.Add(CHAMFER3_SIZE, CHAMFER3_SIZE2, e.wrapped, chamfer3_side_2[0].wrapped)  # the first distance lies on this face
    for e in chamfer3_edges_3:
        chamfer3.Add(CHAMFER3_SIZE, CHAMFER3_SIZE2, e.wrapped, chamfer3_side_3[0].wrapped)  # the first distance lies on this face
    for e in chamfer3_edges_4:
        chamfer3.Add(CHAMFER3_SIZE, CHAMFER3_SIZE2, e.wrapped, chamfer3_side_4[0].wrapped)  # the first distance lies on this face
    for e in chamfer3_edges_5:
        chamfer3.Add(CHAMFER3_SIZE, CHAMFER3_SIZE2, e.wrapped, chamfer3_side_5[0].wrapped)  # the first distance lies on this face
    add(Compound.cast(chamfer3.Shape()), mode=Mode.REPLACE)

    # Fillet1
    fillet1_edges = [extrude_thin1_piece_1_1.edges().sort_by_distance(p)[0] for p in [
        (16, 6.02, -10.62),
        (16, 12.04, -5.31),
        (16, 6.02, 0),
        (0, 12.04, -5.31),
        (0, 6.02, -10.62),
        (0, 0, -5.31),
        (0, 6.02, 0),
        (16, 0, -5.31),
        (8, 12.04, 0),
        (8, 0, 0),
    ]]
    fillet(fillet1_edges, radius=FILLET1_R)


with BuildPart() as extrude_thin1_piece_2_1:
    add(extrude_thin1_piece_2.part)

    # Cut-Extrude2: cut by cut_extrude2_tool
    add(cut_extrude2_tool.part, mode=Mode.SUBTRACT)


solid = Compound([extrude_thin1_piece_1_1.part, extrude_thin1_piece_2_1.part])
